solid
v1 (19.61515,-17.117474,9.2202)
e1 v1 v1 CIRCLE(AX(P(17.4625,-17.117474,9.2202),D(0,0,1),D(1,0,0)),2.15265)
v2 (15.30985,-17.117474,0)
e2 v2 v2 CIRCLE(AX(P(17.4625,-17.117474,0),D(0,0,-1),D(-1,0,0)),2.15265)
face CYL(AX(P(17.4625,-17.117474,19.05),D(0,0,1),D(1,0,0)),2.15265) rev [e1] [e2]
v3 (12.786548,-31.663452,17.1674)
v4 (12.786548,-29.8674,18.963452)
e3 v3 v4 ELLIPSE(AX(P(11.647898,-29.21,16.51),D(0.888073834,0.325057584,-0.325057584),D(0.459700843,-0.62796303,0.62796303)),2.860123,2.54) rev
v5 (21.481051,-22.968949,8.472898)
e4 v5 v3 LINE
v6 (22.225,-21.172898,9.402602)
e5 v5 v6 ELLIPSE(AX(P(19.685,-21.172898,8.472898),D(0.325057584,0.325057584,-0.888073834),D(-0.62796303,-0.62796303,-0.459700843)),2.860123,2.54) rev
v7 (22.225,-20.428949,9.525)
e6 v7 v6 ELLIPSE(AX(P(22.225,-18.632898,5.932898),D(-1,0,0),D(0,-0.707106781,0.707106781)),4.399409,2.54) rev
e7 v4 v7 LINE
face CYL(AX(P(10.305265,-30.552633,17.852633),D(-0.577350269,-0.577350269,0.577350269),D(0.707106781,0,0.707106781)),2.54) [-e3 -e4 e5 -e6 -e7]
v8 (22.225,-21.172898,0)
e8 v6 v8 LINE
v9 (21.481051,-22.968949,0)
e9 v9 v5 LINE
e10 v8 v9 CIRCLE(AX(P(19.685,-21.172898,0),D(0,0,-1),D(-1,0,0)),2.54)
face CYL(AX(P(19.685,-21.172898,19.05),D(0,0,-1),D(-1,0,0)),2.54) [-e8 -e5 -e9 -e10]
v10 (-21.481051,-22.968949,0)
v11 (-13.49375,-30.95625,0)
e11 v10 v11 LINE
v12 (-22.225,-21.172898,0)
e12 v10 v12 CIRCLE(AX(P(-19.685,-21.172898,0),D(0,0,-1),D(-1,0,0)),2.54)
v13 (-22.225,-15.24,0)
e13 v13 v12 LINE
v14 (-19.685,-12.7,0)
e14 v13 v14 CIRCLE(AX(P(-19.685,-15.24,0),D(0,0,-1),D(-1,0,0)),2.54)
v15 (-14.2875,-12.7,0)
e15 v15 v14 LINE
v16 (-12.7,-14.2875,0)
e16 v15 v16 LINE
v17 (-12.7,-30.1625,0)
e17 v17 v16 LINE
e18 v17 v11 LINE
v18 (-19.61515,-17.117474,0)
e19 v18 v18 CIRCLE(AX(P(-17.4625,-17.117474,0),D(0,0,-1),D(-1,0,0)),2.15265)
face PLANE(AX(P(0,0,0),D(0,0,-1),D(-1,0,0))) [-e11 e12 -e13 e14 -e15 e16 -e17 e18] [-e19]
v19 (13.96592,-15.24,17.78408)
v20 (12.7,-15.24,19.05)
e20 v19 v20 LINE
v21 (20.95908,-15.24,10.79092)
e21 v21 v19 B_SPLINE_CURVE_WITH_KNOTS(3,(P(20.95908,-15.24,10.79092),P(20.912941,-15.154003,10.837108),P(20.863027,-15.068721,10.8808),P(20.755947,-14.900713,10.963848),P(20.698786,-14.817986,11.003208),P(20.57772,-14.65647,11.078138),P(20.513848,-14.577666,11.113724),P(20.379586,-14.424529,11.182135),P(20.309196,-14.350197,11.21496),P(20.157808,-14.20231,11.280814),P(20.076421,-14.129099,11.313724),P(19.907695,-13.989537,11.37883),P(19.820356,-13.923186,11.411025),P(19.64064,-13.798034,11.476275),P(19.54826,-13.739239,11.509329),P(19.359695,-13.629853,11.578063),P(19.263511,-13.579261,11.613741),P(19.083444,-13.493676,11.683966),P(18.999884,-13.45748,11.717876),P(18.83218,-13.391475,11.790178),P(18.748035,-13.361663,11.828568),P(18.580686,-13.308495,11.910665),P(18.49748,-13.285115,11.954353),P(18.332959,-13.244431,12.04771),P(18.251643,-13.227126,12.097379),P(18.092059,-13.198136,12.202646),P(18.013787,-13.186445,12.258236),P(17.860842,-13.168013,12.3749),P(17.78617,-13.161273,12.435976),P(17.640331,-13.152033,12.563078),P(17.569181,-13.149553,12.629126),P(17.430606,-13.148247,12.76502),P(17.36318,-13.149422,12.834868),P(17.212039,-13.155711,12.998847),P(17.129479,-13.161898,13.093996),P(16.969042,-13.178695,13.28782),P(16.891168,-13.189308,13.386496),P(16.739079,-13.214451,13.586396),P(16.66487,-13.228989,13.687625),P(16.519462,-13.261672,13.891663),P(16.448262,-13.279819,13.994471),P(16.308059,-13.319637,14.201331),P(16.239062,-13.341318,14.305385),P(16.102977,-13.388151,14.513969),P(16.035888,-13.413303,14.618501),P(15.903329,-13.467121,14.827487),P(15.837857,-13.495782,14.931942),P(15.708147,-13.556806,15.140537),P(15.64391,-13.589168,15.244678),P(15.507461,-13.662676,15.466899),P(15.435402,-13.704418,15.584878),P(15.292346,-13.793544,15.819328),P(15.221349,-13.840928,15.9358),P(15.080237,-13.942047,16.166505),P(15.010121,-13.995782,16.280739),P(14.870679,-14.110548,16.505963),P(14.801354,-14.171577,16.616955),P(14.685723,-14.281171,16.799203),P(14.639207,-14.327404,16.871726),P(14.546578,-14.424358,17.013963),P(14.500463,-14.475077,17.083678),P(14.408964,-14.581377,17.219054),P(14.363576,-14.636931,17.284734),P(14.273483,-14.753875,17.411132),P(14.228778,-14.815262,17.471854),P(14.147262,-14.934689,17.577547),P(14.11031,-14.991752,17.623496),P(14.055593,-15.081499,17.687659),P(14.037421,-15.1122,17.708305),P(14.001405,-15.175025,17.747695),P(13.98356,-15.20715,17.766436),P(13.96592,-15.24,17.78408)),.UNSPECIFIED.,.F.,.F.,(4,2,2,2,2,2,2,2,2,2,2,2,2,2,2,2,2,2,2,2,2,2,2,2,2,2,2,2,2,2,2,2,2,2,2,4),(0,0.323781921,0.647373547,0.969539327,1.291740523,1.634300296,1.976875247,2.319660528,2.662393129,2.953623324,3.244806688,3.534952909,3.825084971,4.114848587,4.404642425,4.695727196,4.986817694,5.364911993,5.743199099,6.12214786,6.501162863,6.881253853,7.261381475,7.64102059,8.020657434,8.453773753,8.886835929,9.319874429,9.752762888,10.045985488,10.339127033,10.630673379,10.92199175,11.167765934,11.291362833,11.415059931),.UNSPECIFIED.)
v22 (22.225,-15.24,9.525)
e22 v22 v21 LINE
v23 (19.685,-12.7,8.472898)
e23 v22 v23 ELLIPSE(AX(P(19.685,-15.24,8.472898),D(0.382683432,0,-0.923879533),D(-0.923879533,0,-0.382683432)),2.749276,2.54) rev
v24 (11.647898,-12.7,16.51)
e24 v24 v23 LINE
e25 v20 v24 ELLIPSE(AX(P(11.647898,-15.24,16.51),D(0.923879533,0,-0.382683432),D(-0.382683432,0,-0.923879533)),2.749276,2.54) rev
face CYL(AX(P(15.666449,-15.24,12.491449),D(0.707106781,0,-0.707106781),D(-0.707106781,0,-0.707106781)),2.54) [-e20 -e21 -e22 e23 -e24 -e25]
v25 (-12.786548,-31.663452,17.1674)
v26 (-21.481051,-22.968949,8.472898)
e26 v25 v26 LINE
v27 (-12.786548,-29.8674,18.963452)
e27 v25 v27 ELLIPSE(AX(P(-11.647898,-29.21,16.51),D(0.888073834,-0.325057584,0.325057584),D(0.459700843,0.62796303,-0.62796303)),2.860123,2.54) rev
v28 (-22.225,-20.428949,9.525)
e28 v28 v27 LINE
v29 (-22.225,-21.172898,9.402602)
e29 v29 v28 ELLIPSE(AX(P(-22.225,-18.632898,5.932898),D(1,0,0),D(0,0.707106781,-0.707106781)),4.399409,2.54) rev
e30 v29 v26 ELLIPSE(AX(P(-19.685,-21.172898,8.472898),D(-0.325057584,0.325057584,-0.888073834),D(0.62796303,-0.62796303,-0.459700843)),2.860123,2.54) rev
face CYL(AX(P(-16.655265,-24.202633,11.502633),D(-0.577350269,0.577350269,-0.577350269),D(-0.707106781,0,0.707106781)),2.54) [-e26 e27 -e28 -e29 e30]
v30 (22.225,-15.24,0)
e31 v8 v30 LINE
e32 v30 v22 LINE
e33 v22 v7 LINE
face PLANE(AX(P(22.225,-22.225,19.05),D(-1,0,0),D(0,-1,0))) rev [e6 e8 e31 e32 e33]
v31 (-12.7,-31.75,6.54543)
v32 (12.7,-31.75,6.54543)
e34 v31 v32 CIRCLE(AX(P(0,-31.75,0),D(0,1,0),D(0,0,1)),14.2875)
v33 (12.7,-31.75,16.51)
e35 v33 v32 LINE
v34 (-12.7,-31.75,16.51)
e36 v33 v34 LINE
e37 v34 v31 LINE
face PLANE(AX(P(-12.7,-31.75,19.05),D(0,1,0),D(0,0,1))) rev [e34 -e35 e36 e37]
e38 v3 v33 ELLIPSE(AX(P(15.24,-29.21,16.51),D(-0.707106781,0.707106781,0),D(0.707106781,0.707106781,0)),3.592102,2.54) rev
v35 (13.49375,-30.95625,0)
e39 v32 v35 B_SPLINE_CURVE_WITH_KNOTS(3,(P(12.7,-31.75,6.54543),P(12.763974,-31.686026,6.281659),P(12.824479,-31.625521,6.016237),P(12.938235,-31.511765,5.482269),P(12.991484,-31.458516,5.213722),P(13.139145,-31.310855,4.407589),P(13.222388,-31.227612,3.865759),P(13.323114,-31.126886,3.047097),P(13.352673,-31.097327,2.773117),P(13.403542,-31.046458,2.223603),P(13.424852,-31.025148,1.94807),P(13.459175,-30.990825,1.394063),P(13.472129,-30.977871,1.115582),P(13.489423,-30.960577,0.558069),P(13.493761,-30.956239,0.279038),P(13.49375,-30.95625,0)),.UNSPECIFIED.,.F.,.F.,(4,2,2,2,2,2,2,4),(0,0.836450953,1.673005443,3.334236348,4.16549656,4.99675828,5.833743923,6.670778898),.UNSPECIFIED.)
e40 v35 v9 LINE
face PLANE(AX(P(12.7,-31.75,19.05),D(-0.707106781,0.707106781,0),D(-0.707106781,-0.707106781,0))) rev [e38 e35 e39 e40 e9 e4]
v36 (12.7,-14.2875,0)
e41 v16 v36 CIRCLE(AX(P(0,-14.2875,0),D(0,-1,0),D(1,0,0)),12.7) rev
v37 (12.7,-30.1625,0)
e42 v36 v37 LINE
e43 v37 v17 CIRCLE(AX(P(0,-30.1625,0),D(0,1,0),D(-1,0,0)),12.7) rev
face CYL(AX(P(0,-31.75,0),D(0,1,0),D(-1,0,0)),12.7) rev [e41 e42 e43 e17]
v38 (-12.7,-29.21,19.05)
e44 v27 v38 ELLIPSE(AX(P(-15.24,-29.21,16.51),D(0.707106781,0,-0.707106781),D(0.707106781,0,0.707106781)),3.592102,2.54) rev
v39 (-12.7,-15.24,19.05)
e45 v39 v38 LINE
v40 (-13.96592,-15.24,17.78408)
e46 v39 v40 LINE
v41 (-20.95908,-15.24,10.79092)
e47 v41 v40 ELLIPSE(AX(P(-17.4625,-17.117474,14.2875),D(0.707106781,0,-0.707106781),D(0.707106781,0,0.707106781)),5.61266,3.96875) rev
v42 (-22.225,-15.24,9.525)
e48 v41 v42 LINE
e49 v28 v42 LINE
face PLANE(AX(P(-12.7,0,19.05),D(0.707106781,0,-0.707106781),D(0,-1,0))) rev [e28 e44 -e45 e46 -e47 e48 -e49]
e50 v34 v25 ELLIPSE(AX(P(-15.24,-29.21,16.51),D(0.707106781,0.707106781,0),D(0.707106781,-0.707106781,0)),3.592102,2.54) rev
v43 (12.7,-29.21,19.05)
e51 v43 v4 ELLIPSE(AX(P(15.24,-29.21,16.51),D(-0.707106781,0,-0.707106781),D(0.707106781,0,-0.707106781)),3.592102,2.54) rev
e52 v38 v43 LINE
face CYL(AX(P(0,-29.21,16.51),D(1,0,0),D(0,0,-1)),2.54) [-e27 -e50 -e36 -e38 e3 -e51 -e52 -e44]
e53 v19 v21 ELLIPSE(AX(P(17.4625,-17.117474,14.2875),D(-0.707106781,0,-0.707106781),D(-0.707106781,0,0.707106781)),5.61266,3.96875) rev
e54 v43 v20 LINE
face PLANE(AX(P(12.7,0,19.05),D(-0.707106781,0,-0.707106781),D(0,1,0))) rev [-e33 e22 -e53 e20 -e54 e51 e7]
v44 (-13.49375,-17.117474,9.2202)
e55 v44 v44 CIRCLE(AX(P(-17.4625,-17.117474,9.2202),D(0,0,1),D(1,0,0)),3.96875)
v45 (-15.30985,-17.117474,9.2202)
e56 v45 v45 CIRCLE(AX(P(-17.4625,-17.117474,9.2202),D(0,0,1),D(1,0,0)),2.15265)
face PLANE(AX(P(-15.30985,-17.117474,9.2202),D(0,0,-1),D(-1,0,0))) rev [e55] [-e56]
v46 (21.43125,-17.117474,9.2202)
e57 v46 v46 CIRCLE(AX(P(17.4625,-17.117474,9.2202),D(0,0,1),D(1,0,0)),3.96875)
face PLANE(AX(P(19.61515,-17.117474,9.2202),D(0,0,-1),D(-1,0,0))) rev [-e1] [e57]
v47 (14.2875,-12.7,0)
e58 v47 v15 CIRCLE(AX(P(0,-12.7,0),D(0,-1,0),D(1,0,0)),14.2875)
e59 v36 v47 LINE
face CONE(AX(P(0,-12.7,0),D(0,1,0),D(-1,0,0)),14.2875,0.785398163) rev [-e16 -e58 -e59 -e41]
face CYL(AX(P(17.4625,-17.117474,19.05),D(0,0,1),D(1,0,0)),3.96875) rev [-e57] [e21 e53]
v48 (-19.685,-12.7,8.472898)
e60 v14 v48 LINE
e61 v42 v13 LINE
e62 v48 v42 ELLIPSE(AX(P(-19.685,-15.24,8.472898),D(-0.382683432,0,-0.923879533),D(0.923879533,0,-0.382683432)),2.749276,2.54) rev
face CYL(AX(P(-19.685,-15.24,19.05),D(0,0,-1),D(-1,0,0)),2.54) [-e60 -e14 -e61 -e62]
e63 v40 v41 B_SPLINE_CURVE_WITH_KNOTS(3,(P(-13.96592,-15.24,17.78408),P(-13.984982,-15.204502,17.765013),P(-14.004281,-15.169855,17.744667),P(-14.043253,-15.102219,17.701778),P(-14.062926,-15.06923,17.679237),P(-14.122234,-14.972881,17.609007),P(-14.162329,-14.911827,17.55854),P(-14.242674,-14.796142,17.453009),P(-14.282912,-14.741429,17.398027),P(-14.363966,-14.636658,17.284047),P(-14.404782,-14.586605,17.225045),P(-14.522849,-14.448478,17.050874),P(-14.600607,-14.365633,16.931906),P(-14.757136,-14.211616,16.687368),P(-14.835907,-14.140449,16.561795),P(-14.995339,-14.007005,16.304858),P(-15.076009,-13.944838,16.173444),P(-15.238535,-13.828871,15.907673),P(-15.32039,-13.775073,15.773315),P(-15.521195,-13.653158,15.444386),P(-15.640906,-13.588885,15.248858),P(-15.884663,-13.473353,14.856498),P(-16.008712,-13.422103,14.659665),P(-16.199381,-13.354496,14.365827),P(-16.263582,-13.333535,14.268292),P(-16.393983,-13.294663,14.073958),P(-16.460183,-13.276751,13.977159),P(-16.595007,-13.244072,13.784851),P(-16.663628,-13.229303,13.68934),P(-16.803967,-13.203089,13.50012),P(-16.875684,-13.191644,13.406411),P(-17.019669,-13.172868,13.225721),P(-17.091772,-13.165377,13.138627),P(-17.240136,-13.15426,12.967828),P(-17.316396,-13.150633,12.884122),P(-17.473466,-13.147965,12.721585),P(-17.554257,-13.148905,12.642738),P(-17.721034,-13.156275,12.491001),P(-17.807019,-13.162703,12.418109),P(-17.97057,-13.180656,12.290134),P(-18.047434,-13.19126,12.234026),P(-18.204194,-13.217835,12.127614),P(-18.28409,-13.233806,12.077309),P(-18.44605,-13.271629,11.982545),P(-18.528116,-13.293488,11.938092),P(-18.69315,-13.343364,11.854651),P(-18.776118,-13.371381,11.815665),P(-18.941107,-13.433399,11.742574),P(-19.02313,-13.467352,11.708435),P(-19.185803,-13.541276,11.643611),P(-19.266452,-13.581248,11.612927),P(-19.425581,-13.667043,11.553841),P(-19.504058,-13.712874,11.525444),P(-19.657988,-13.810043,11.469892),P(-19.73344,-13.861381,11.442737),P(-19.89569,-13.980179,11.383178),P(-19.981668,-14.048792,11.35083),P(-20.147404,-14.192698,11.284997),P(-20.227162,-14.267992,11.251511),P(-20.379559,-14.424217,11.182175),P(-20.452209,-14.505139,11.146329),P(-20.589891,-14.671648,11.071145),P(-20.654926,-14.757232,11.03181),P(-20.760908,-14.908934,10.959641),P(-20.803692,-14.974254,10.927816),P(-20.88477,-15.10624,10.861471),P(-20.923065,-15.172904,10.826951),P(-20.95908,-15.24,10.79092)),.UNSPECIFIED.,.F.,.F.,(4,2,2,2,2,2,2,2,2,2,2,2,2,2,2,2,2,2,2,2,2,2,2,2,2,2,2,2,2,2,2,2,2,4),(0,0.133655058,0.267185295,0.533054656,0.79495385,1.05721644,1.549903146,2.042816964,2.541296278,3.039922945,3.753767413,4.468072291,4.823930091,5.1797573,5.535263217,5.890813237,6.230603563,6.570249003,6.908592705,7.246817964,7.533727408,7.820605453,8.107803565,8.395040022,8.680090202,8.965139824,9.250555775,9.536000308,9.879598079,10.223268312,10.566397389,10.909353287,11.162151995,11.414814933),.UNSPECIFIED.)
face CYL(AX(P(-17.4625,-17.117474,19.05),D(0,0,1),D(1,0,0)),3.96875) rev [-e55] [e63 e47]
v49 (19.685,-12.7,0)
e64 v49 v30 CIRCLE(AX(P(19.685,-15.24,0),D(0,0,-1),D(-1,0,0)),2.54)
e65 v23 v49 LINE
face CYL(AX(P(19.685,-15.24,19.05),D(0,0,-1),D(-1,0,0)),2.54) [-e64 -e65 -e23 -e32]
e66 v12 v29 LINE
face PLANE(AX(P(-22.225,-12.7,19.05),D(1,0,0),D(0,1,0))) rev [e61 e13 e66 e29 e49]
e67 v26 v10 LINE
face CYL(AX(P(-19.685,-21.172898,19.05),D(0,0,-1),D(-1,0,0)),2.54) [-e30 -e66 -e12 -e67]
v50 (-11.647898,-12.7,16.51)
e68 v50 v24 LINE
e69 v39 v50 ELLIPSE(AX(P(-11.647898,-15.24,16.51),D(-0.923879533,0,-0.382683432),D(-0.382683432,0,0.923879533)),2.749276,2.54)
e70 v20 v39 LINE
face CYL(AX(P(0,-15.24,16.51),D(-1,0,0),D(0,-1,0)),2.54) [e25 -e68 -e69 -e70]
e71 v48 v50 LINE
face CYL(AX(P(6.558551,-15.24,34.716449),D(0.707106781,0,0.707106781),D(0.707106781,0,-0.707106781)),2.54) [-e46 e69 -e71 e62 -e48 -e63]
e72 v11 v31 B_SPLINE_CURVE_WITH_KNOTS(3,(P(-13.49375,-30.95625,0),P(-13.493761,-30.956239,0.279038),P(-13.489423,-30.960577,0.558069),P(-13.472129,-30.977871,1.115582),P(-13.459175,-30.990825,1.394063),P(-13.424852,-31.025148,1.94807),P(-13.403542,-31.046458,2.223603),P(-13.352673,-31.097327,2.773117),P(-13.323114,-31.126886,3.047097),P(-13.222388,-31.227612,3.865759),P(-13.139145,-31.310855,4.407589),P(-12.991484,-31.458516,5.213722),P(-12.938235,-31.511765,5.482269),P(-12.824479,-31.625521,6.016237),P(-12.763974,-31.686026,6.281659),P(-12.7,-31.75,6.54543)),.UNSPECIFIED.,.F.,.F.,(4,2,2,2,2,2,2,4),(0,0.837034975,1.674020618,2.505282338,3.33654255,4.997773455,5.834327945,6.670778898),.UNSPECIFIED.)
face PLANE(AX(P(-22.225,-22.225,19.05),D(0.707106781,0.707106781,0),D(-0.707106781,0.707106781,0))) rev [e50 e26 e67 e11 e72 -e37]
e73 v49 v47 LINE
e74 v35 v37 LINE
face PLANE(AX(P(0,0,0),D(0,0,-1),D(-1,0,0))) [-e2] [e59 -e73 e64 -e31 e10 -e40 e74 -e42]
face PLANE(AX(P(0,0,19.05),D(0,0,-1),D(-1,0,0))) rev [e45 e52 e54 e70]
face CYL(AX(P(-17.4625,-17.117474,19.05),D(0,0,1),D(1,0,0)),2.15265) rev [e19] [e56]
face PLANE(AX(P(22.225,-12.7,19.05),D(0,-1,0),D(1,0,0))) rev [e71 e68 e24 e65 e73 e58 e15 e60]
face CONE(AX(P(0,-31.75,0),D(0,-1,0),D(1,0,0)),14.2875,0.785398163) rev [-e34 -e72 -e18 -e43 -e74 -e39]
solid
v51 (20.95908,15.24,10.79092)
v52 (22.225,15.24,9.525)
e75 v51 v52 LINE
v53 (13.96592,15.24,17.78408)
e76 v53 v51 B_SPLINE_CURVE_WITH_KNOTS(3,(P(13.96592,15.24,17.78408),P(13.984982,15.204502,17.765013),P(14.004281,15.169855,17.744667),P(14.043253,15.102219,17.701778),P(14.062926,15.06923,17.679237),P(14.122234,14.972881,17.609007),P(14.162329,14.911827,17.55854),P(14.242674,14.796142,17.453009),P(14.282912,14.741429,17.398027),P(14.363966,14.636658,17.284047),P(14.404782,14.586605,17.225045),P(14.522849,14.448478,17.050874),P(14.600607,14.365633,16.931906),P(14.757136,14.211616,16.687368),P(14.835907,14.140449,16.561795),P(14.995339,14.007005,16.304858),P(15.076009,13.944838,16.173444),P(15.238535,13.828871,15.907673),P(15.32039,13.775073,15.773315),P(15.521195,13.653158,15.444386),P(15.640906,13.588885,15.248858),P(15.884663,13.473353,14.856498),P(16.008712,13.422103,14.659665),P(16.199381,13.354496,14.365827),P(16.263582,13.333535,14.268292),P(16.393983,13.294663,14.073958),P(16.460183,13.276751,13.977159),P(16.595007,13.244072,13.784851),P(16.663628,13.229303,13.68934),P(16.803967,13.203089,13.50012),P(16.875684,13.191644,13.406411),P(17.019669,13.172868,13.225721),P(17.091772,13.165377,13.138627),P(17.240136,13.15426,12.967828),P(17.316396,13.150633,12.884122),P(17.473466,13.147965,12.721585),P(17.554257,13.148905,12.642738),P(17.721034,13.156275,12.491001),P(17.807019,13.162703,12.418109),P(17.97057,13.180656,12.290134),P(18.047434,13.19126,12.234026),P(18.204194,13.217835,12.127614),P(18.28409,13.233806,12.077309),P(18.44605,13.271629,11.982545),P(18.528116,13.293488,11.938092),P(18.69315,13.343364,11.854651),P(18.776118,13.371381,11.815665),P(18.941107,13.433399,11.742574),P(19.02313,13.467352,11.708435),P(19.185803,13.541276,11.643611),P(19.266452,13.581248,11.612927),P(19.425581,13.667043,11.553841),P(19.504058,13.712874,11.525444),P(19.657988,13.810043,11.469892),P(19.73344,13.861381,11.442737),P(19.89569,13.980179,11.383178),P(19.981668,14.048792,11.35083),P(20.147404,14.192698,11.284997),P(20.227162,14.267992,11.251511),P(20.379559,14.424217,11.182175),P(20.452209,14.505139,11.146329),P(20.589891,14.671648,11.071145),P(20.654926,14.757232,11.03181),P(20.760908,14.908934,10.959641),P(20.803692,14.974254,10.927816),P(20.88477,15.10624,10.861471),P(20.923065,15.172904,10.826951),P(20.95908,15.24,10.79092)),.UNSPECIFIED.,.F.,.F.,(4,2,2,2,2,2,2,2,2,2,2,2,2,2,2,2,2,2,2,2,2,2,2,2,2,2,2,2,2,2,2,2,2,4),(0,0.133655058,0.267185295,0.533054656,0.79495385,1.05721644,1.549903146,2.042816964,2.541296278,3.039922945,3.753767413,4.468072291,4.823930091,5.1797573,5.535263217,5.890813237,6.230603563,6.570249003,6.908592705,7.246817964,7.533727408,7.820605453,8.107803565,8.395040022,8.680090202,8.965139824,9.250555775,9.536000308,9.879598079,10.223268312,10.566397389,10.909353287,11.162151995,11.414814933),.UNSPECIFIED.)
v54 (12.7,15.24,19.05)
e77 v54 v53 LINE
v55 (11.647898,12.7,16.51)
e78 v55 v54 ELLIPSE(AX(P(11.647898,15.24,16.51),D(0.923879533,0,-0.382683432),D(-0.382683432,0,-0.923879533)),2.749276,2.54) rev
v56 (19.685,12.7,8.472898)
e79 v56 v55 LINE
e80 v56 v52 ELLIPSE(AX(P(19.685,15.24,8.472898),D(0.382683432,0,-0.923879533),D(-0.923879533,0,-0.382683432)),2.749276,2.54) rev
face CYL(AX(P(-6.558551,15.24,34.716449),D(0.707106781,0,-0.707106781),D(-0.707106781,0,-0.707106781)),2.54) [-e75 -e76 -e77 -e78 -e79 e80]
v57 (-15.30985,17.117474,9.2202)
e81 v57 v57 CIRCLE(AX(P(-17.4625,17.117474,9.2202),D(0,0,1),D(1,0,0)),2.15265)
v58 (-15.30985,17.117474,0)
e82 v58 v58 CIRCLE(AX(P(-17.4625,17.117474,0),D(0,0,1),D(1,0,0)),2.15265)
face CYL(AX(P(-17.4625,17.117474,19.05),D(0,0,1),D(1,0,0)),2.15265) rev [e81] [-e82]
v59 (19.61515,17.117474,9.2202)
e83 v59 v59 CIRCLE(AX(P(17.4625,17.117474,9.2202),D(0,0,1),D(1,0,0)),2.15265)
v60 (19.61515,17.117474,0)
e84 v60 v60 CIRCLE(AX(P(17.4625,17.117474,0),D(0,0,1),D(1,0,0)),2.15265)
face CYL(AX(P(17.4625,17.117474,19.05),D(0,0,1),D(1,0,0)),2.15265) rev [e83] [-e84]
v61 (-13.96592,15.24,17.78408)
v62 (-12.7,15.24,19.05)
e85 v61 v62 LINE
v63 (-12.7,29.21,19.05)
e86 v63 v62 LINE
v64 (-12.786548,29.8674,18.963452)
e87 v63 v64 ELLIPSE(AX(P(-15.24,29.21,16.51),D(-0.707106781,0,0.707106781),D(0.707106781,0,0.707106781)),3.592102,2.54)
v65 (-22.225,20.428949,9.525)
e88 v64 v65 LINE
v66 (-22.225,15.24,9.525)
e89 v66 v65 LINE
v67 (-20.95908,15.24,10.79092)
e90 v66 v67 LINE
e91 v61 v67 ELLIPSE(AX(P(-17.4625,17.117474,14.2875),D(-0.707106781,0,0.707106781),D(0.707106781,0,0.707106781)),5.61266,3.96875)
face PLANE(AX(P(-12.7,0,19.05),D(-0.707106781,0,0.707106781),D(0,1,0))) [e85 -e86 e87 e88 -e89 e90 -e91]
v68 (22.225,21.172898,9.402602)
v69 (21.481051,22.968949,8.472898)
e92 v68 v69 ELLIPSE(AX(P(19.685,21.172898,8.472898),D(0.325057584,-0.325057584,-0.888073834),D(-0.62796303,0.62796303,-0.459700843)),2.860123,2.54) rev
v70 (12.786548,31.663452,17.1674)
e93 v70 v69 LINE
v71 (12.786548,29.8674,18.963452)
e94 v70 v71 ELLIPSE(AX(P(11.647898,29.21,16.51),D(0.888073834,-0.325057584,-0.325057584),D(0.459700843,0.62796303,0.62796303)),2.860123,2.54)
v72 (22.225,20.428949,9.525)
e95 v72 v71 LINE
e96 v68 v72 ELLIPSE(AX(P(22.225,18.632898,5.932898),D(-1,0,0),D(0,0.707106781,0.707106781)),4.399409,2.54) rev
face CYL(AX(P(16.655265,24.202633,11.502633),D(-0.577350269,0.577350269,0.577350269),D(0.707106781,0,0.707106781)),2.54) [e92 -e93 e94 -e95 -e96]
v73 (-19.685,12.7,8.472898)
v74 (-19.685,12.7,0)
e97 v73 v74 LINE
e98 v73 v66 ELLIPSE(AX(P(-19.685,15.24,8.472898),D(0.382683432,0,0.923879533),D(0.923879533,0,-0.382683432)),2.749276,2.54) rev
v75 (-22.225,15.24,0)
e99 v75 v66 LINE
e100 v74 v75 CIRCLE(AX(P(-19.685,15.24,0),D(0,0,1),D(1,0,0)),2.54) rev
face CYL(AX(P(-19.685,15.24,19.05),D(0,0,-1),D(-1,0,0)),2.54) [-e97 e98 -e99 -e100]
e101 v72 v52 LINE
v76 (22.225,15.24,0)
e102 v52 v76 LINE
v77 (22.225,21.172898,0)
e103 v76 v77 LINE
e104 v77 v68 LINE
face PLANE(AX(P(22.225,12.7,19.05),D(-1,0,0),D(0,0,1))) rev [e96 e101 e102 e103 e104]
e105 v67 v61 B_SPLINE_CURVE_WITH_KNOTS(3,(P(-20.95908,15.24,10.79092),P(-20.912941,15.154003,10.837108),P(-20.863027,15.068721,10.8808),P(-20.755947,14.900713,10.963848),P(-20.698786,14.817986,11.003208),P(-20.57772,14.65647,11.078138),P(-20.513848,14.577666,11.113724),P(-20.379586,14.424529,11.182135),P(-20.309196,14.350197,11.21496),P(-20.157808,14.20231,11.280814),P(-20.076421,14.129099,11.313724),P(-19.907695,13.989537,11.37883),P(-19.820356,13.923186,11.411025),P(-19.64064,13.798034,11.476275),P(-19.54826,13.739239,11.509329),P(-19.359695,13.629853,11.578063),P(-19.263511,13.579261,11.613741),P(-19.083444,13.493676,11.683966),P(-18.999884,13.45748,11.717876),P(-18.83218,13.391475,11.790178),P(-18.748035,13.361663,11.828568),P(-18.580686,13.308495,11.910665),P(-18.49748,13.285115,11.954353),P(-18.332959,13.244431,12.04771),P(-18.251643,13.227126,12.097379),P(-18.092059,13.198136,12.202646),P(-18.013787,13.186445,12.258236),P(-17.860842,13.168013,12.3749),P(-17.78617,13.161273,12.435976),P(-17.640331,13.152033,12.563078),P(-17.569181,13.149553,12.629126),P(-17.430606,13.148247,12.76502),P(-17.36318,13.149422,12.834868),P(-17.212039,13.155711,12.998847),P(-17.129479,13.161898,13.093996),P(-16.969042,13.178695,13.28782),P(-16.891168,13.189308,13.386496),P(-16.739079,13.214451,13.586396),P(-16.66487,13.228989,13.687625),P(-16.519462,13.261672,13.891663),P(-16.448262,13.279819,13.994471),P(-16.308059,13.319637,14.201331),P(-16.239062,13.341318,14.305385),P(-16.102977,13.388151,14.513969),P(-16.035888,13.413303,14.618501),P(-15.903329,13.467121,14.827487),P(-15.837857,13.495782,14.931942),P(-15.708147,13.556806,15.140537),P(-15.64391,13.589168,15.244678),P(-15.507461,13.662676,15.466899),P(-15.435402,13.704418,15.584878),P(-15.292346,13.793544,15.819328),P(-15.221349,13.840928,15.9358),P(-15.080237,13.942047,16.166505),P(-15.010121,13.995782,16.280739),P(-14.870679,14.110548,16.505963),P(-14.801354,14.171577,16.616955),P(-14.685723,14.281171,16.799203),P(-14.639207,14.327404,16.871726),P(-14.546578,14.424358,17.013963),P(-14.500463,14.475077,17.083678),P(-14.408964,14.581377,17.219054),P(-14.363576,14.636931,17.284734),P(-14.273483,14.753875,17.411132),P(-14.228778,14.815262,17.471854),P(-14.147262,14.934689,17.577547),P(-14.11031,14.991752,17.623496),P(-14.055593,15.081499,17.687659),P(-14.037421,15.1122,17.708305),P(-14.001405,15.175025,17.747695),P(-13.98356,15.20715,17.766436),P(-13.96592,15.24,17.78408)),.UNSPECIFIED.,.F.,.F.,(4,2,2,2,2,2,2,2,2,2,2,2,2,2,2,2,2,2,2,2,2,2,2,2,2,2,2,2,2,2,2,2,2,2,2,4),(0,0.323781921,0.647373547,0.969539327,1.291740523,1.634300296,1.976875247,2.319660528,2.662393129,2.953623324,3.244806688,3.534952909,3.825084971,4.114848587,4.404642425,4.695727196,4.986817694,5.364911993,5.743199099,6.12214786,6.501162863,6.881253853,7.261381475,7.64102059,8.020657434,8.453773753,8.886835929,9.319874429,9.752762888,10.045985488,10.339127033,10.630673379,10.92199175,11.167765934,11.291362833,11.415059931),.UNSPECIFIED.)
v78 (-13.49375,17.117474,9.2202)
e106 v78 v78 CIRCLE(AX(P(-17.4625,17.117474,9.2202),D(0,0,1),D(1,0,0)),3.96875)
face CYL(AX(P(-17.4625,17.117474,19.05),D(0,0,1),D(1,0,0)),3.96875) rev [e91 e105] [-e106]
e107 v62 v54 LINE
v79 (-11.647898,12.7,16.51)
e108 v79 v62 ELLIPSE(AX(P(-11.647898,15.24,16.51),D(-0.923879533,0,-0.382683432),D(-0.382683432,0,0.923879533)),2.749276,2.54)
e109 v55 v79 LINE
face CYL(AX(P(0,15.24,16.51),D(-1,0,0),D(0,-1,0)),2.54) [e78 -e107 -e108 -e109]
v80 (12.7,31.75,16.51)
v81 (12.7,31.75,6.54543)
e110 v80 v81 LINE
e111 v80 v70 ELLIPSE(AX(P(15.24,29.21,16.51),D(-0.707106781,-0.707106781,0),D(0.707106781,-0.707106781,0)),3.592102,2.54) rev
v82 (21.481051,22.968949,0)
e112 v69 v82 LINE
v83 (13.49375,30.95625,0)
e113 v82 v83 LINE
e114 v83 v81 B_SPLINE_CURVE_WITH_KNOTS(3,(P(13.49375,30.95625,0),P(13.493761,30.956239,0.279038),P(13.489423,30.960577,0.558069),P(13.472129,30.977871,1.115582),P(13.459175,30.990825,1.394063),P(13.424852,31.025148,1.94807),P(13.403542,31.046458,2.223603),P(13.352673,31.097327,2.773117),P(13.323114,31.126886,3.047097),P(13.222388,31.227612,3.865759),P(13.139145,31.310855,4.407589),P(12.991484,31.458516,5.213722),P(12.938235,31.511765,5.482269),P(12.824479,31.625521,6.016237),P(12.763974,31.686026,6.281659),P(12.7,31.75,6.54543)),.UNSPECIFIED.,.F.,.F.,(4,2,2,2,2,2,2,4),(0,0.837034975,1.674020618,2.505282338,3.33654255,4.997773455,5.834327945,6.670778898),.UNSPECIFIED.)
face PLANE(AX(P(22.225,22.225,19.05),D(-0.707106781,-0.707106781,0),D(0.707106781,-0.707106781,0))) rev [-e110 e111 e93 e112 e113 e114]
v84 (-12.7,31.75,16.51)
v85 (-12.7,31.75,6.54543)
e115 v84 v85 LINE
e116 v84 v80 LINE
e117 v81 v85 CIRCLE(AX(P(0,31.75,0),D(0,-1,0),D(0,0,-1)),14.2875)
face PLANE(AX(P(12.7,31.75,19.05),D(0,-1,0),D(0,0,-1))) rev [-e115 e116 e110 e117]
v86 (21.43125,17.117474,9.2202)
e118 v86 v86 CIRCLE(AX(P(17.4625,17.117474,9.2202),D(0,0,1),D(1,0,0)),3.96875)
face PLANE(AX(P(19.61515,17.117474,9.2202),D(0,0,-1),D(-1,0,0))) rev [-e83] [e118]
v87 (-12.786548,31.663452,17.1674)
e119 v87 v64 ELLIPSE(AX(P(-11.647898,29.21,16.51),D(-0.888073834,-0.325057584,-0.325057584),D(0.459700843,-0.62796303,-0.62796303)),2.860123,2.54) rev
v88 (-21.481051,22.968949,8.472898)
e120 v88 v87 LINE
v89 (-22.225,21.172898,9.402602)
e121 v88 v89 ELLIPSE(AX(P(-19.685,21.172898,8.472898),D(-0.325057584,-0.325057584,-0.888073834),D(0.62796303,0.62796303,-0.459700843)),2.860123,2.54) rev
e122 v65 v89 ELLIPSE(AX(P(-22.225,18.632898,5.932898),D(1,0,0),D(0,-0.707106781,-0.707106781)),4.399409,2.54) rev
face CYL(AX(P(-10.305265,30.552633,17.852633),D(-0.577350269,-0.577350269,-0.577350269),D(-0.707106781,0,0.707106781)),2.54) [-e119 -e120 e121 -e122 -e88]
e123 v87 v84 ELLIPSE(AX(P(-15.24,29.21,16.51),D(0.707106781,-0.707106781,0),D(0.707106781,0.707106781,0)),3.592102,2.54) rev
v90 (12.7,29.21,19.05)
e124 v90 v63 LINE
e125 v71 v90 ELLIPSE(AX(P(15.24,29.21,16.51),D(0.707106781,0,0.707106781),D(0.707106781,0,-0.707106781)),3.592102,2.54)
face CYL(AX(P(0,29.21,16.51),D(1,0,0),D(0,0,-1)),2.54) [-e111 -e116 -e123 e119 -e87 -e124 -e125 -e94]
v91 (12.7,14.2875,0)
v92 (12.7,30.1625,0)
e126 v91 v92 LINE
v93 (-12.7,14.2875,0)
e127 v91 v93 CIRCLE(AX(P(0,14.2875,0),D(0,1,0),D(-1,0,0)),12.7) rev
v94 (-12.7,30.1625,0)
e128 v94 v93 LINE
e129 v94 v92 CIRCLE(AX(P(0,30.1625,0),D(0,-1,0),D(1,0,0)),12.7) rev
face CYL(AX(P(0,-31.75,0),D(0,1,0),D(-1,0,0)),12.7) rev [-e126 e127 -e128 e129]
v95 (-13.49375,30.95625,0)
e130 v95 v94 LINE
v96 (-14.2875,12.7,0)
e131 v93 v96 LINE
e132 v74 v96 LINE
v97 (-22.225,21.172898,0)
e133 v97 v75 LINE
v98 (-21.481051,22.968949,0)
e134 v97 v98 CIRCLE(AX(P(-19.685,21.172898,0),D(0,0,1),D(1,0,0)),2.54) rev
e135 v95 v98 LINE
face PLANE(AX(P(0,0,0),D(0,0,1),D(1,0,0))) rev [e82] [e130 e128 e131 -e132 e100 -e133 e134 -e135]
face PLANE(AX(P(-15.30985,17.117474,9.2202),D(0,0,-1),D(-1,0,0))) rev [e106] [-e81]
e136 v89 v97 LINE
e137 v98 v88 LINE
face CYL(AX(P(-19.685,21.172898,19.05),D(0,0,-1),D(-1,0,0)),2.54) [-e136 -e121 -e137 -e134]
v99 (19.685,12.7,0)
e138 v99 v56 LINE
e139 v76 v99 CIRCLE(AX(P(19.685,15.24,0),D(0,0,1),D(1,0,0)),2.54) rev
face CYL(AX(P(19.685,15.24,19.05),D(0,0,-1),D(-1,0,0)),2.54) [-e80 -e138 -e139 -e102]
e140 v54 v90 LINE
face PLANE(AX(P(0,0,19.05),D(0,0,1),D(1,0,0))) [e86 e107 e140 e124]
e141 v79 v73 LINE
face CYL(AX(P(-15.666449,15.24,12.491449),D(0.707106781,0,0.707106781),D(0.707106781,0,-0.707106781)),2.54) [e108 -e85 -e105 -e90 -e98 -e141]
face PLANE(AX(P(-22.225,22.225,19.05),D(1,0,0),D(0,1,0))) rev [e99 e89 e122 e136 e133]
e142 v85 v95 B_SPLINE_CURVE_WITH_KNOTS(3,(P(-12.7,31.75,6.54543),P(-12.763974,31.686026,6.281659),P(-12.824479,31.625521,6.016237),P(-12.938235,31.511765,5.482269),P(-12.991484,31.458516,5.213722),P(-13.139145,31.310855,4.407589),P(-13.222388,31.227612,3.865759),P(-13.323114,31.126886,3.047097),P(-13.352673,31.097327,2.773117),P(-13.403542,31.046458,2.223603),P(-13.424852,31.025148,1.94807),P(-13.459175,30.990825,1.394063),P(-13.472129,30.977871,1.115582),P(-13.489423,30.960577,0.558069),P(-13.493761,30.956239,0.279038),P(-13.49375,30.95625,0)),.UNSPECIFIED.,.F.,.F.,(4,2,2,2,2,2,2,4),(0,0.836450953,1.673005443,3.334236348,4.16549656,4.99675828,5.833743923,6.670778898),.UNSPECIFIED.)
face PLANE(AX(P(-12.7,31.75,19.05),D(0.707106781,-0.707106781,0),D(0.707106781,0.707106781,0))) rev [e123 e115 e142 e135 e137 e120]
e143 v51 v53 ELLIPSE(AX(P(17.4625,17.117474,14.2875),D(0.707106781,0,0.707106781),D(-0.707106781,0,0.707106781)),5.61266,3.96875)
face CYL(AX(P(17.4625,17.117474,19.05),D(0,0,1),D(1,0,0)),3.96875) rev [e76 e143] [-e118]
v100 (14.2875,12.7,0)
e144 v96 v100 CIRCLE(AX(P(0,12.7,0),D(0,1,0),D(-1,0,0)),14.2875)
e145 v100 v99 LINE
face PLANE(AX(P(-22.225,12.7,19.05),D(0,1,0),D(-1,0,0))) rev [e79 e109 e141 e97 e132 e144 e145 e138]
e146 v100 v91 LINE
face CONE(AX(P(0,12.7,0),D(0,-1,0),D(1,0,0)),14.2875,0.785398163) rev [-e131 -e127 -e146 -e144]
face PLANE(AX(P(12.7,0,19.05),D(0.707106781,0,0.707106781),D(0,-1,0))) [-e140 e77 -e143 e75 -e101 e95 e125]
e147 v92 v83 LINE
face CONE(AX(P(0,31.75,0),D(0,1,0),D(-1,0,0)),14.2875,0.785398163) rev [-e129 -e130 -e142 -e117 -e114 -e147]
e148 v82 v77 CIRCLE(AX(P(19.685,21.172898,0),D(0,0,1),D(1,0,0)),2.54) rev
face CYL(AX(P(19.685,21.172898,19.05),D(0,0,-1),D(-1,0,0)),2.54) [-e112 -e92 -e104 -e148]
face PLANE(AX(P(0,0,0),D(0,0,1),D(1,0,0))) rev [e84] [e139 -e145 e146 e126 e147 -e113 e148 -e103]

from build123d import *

# Parameters (mm, degrees)
BOSS_EXTRUDE1_DEPTH                         = 19.05
BOSS_EXTRUDE1_2_DEPTH                       = 19.05
CUT_EXTRUDE1_DEPTH                          = 70.922121857
CUT_EXTRUDE1_DEPTH_BACK                     = 70.922121857
SKETCH2_R                                   = 12.7
CHAMFER1_SIZE                               = 9.525
CHAMFER2_SIZE                               = 9.525
CHAMFER3_SIZE                               = 1.5875
CHAMFER4_SIZE                               = 1.5875
FILLET1_R                                   = 2.54
FILLET2_R                                   = 2.54
CBORE_FOR_6_BINDING_HEAD_MACHINE_SC_2_COUNT = 2
CBORE_FOR_6_BINDING_HEAD_MACHINE_SC_2_PITCH = 34.234947664
CBORE_FOR_6_BINDING_HEAD_MACHINE_SC_3_COUNT = 2
CBORE_FOR_6_BINDING_HEAD_MACHINE_SC_3_PITCH = 34.925
CBORE_FOR_6_BINDING_HEAD_MACHINE_SC_4_COUNT = 2
CBORE_FOR_6_BINDING_HEAD_MACHINE_SC_4_PITCH = 48.905902165


with BuildPart() as part:
    # Sketch1 → Boss-Extrude1 (new body)
    with BuildSketch(Plane.XY):
        Polygon((22.225, -12.7), (-22.225, -12.7), (-22.225, -22.225), (-12.7, -31.75), (12.7, -31.75), (22.225, -22.225), align=None)
    extrude(amount=BOSS_EXTRUDE1_DEPTH)


with BuildPart() as body_2:
    # Sketch1 → Boss-Extrude1 2 (new body)
    with BuildSketch(Plane.XY):
        Polygon((-22.225, 22.225), (-22.225, 12.7), (22.225, 12.7), (22.225, 22.225), (12.7, 31.75), (-12.7, 31.75), align=None)
    extrude(amount=BOSS_EXTRUDE1_2_DEPTH)


with BuildPart() as cut_extrude1_tool:
    # Sketch2 → Cut-Extrude1 (new, two sides: drawn at the far end of the back side and taken through both)
    with BuildSketch(Plane.ZX.offset(31.75).offset(-CUT_EXTRUDE1_DEPTH_BACK)):
        Circle(SKETCH2_R)
    extrude(amount=CUT_EXTRUDE1_DEPTH + CUT_EXTRUDE1_DEPTH_BACK)


with BuildPart() as part_1:
    add(part.part)

    # Cut-Extrude1: cut by cut_extrude1_tool
    add(cut_extrude1_tool.part, mode=Mode.SUBTRACT)

    # Chamfer2
    chamfer2_edges = [part_1.edges().sort_by_distance(p)[0] for p in [
        (22.225, -17.4625, 19.05),
        (-22.225, -17.4625, 19.05),
    ]]
    chamfer(chamfer2_edges, length=CHAMFER2_SIZE)

    # Chamfer3
    chamfer3_edges = [part_1.edges().sort_by_distance(p)[0] for p in [
        (0, -31.75, 12.7),
        (0, -12.7, 12.7),
    ]]
    chamfer(chamfer3_edges, length=CHAMFER3_SIZE)

    # Fillet1
    # the kernel refuses this fillet: 2.54 mm, written as the material it takes off along each edge
    with BuildSketch(Plane(origin=(-19.05, -31.75, 19.05), x_dir=(0, 1, 0), z_dir=(1, 0, 0))) as fillet1_piece_1:
        with BuildLine():
            CenterArc((FILLET1_R, -FILLET1_R), FILLET1_R, 90, 90)
            Line((0, -FILLET1_R), (0, 0))
            Line((0, 0), (FILLET1_R, 0))
        make_face()
    extrude(amount=38.1, mode=Mode.SUBTRACT)
    with BuildSketch(Plane(origin=(19.05, -12.7, 19.05), x_dir=(0, 0, -1), z_dir=(-1, 0, 0))) as fillet1_piece_2:
        with BuildLine():
            CenterArc((FILLET1_R, FILLET1_R), FILLET1_R, 180, 90)
            Line((0, FILLET1_R), (0, 0))
            Line((0, 0), (FILLET1_R, 0))
        make_face()
    extrude(amount=38.1, mode=Mode.SUBTRACT)
    with BuildSketch(Plane(origin=(-22.225, -12.7, -6.35), x_dir=(1, 0, 0), z_dir=(0, 0, 1))) as fillet1_piece_3:
        with BuildLine():
            CenterArc((FILLET1_R, -FILLET1_R), FILLET1_R, 90, 90)
            Line((0, -FILLET1_R), (0, 0))
            Line((0, 0), (FILLET1_R, 0))
        make_face()
    extrude(amount=22.225, mode=Mode.SUBTRACT)
    with BuildSketch(Plane(origin=(22.225, -12.7, -6.35), x_dir=(-1, 0, 0), z_dir=(0, 0, 1))) as fillet1_piece_4:
        with BuildLine():
            CenterArc((FILLET1_R, FILLET1_R), FILLET1_R, 180, 90)
            Line((0, FILLET1_R), (0, 0))
            Line((0, 0), (FILLET1_R, 0))
        make_face()
    extrude(amount=22.225, mode=Mode.SUBTRACT)
    with BuildSketch(Plane(origin=(-26.715128061, -12.7, 5.034871939), x_dir=(0.7071067811865475, 0, -0.7071067811865475), z_dir=(0.7071067811865476, 0, 0.7071067811865476)), Plane(origin=(8.209871939, -12.7, 23.540128061), x_dir=(-0.7071067811865476, 0, -0.7071067811865476), z_dir=(0.7071067811865476, 0, -0.7071067811865476))) as fillet1_piece_5:
        with BuildLine():
            CenterArc((FILLET1_R, -FILLET1_R), FILLET1_R, 90, 90)
            Line((0, -FILLET1_R), (0, 0))
            Line((0, 0), (FILLET1_R, 0))
        make_face()
    extrude(amount=26.170384182, mode=Mode.SUBTRACT)
    with BuildSketch(Plane(origin=(22.225, -22.225, -2.630256121), x_dir=(0, 1, 0), z_dir=(0, 0, 1))) as fillet1_piece_6:
        with BuildLine():
            CenterArc((FILLET1_R * 0.414213562373, FILLET1_R), FILLET1_R, 225, 45)
            Line((-FILLET1_R * 0.292893218813, FILLET1_R * 0.292893218813), (0, 0))
            Line((0, 0), (FILLET1_R * 0.414213562373, 0))
        make_face()
    extrude(amount=14.785512242, mode=Mode.SUBTRACT)
    with BuildSketch(Plane(origin=(10.583333333, -33.866666667, 21.166666667), x_dir=(-0.4082482904638614, 0.8164965809277265, 0.40824829046386385), z_dir=(0.5773502691896262, 0.5773502691896252, -0.577350269189626)), Plane(origin=(-24.341666667, -20.108333333, 7.408333333), x_dir=(0.4082482904638628, 0.8164965809277268, 0.4082482904638616), z_dir=(0.5773502691896265, -0.5773502691896246, 0.5773502691896263))) as fillet1_piece_7:
        with BuildLine():
            CenterArc((FILLET1_R * 0.57735026919, -FILLET1_R), FILLET1_R, 90, 60)
            Line((-FILLET1_R * 0.288675134595, -FILLET1_R * 0.5), (0, 0))
            Line((0, 0), (FILLET1_R * 0.57735026919, 0))
        make_face()
    extrude(amount=23.830132361, mode=Mode.SUBTRACT)
    with BuildSketch(Plane(origin=(-22.225, -22.225, -2.630256121), x_dir=(0, 1, 0), z_dir=(0, 0, 1))) as fillet1_piece_8:
        with BuildLine():
            CenterArc((FILLET1_R * 0.414213562373, -FILLET1_R), FILLET1_R, 90, 45)
            Line((-FILLET1_R * 0.292893218813, -FILLET1_R * 0.292893218813), (0, 0))
            Line((0, 0), (FILLET1_R * 0.414213562373, 0))
        make_face()
    extrude(amount=14.785512242, mode=Mode.SUBTRACT)


with BuildPart() as body_2_1:
    add(body_2.part)

    # Cut-Extrude1: cut by cut_extrude1_tool
    add(cut_extrude1_tool.part, mode=Mode.SUBTRACT)

    # Chamfer1
    chamfer1_edges = [body_2_1.edges().sort_by_distance(p)[0] for p in [
        (22.225, 17.4625, 19.05),
        (-22.225, 17.4625, 19.05),
    ]]
    chamfer(chamfer1_edges, length=CHAMFER1_SIZE)

    # Chamfer4
    chamfer4_edges = [body_2_1.edges().sort_by_distance(p)[0] for p in [
        (0, 12.7, 12.7),
        (0, 31.75, 12.7),
    ]]
    chamfer(chamfer4_edges, length=CHAMFER4_SIZE)

    # Fillet2
    # the kernel refuses this fillet: 2.54 mm, written as the material it takes off along each edge
    with BuildSketch(Plane(origin=(-19.05, 12.7, 19.05), x_dir=(0, 0, -1), z_dir=(1, 0, 0)), Plane(origin=(19.05, 31.75, 19.05), x_dir=(0, 0, -1), z_dir=(-1, 0, 0))) as fillet2_piece_1:
        with BuildLine():
            CenterArc((FILLET2_R, FILLET2_R), FILLET2_R, 180, 90)
            Line((0, FILLET2_R), (0, 0))
            Line((0, 0), (FILLET2_R, 0))
        make_face()
    extrude(amount=38.1, mode=Mode.SUBTRACT)
    with BuildSketch(Plane(origin=(22.225, 22.225, -2.630256121), x_dir=(-0.7071067811865492, 0.7071067811865458, 0), z_dir=(0, 0, 1))) as fillet2_piece_2:
        with BuildLine():
            CenterArc((FILLET2_R * 0.414213562373, FILLET2_R), FILLET2_R, 225, 45)
            Line((-FILLET2_R * 0.292893218813, FILLET2_R * 0.292893218813), (0, 0))
            Line((0, 0), (FILLET2_R * 0.414213562373, 0))
        make_face()
    extrude(amount=14.785512242, mode=Mode.SUBTRACT)
    with BuildSketch(Plane(origin=(10.583333333, 33.866666667, 21.166666667), x_dir=(-0.4082482904638657, 0.4082482904638608, -0.8164965809277257), z_dir=(0.5773502691896262, -0.5773502691896251, -0.5773502691896262)), Plane(origin=(-24.341666667, 20.108333333, 7.408333333), x_dir=(0.4082482904638632, 0.4082482904638632, -0.8164965809277258), z_dir=(0.5773502691896257, 0.5773502691896256, 0.577350269189626))) as fillet2_piece_3:
        with BuildLine():
            CenterArc((FILLET2_R * 0.57735026919, -FILLET2_R), FILLET2_R, 90, 60)
            Line((-FILLET2_R * 0.288675134595, -FILLET2_R * 0.5), (0, 0))
            Line((0, 0), (FILLET2_R * 0.57735026919, 0))
        make_face()
    extrude(amount=23.830132361, mode=Mode.SUBTRACT)
    with BuildSketch(Plane(origin=(22.225, 12.7, -6.35), x_dir=(-1, 0, 0), z_dir=(0, 0, 1)), Plane(origin=(-22.225, 12.7, -6.35), x_dir=(0, 1, 0), z_dir=(0, 0, 1))) as fillet2_piece_4:
        with BuildLine():
            CenterArc((FILLET2_R, -FILLET2_R), FILLET2_R, 90, 90)
            Line((0, -FILLET2_R), (0, 0))
            Line((0, 0), (FILLET2_R, 0))
        make_face()
    extrude(amount=22.225, mode=Mode.SUBTRACT)
    with BuildSketch(Plane(origin=(-26.715128061, 12.7, 5.034871939), x_dir=(0, 1, 0), z_dir=(0.7071067811865476, 0, 0.7071067811865476))) as fillet2_piece_5:
        with BuildLine():
            CenterArc((FILLET2_R, -FILLET2_R), FILLET2_R, 90, 90)
            Line((0, -FILLET2_R), (0, 0))
            Line((0, 0), (FILLET2_R, 0))
        make_face()
    extrude(amount=26.170384182, mode=Mode.SUBTRACT)
    with BuildSketch(Plane(origin=(8.209871939, 12.7, 23.540128061), x_dir=(-0.7071067811865475, 0, -0.7071067811865475), z_dir=(0.7071067811865476, 0, -0.7071067811865476))) as fillet2_piece_6:
        with BuildLine():
            CenterArc((FILLET2_R, FILLET2_R), FILLET2_R, 180, 90)
            Line((0, FILLET2_R), (0, 0))
            Line((0, 0), (FILLET2_R, 0))
        make_face()
    extrude(amount=26.170384182, mode=Mode.SUBTRACT)
    with BuildSketch(Plane(origin=(-22.225, 22.225, -2.630256121), x_dir=(0.7071067811865476, 0.7071067811865476, 0), z_dir=(0, 0, 1))) as fillet2_piece_7:
        with BuildLine():
            CenterArc((FILLET2_R * 0.414213562373, -FILLET2_R), FILLET2_R, 90, 45)
            Line((-FILLET2_R * 0.292893218813, -FILLET2_R * 0.292893218813), (0, 0))
            Line((0, 0), (FILLET2_R * 0.414213562373, 0))
        make_face()
    extrude(amount=14.785512242, mode=Mode.SUBTRACT)

    # Sketch4 → CBORE for #6 Binding Head Machine Screw1 (revolve, cut)
    with BuildSketch(Plane(origin=(-17.4625, 17.117473832, 19.05), x_dir=(0, -1, 0), z_dir=(1, 0, 0))):
        Polygon((0, 0), (0, 23.645442612), (2.15265, 22.352), (2.15265, 9.8298), (3.96875, 9.8298), (3.96875, 0), align=None)
    cbore_for_6_binding_head_machine_screw1 = revolve(axis=Axis((-17.4625, 17.117473832, 25.4), (0, 0, -1)), mode=Mode.SUBTRACT)

    # CBORE for _6 Binding Head Machine Sc 3: CBORE for #6 Binding Head Machine Screw1 ×2
    with Locations(*[(i * CBORE_FOR_6_BINDING_HEAD_MACHINE_SC_3_PITCH, 0, 0) for i in range(1, CBORE_FOR_6_BINDING_HEAD_MACHINE_SC_3_COUNT)]):
        add(cbore_for_6_binding_head_machine_screw1, mode=Mode.SUBTRACT)


with BuildPart() as part_2:
    add(part_1.part)

    # CBORE for _6 Binding Head Machine Sc 2: CBORE for #6 Binding Head Machine Screw1 ×2
    with Locations(*[(0, -i * CBORE_FOR_6_BINDING_HEAD_MACHINE_SC_2_PITCH, 0) for i in range(1, CBORE_FOR_6_BINDING_HEAD_MACHINE_SC_2_COUNT)]):
        add(cbore_for_6_binding_head_machine_screw1, mode=Mode.SUBTRACT)

    # CBORE for _6 Binding Head Machine Sc 4: CBORE for #6 Binding Head Machine Screw1 ×2
    with Locations(*[Vector(0.7141264848198602, -0.7000166881430973, 0) * (i * CBORE_FOR_6_BINDING_HEAD_MACHINE_SC_4_PITCH) for i in range(1, CBORE_FOR_6_BINDING_HEAD_MACHINE_SC_4_COUNT)]):
        add(cbore_for_6_binding_head_machine_screw1, mode=Mode.SUBTRACT)


solid = Compound([body_2_1.part, part_2.part])
